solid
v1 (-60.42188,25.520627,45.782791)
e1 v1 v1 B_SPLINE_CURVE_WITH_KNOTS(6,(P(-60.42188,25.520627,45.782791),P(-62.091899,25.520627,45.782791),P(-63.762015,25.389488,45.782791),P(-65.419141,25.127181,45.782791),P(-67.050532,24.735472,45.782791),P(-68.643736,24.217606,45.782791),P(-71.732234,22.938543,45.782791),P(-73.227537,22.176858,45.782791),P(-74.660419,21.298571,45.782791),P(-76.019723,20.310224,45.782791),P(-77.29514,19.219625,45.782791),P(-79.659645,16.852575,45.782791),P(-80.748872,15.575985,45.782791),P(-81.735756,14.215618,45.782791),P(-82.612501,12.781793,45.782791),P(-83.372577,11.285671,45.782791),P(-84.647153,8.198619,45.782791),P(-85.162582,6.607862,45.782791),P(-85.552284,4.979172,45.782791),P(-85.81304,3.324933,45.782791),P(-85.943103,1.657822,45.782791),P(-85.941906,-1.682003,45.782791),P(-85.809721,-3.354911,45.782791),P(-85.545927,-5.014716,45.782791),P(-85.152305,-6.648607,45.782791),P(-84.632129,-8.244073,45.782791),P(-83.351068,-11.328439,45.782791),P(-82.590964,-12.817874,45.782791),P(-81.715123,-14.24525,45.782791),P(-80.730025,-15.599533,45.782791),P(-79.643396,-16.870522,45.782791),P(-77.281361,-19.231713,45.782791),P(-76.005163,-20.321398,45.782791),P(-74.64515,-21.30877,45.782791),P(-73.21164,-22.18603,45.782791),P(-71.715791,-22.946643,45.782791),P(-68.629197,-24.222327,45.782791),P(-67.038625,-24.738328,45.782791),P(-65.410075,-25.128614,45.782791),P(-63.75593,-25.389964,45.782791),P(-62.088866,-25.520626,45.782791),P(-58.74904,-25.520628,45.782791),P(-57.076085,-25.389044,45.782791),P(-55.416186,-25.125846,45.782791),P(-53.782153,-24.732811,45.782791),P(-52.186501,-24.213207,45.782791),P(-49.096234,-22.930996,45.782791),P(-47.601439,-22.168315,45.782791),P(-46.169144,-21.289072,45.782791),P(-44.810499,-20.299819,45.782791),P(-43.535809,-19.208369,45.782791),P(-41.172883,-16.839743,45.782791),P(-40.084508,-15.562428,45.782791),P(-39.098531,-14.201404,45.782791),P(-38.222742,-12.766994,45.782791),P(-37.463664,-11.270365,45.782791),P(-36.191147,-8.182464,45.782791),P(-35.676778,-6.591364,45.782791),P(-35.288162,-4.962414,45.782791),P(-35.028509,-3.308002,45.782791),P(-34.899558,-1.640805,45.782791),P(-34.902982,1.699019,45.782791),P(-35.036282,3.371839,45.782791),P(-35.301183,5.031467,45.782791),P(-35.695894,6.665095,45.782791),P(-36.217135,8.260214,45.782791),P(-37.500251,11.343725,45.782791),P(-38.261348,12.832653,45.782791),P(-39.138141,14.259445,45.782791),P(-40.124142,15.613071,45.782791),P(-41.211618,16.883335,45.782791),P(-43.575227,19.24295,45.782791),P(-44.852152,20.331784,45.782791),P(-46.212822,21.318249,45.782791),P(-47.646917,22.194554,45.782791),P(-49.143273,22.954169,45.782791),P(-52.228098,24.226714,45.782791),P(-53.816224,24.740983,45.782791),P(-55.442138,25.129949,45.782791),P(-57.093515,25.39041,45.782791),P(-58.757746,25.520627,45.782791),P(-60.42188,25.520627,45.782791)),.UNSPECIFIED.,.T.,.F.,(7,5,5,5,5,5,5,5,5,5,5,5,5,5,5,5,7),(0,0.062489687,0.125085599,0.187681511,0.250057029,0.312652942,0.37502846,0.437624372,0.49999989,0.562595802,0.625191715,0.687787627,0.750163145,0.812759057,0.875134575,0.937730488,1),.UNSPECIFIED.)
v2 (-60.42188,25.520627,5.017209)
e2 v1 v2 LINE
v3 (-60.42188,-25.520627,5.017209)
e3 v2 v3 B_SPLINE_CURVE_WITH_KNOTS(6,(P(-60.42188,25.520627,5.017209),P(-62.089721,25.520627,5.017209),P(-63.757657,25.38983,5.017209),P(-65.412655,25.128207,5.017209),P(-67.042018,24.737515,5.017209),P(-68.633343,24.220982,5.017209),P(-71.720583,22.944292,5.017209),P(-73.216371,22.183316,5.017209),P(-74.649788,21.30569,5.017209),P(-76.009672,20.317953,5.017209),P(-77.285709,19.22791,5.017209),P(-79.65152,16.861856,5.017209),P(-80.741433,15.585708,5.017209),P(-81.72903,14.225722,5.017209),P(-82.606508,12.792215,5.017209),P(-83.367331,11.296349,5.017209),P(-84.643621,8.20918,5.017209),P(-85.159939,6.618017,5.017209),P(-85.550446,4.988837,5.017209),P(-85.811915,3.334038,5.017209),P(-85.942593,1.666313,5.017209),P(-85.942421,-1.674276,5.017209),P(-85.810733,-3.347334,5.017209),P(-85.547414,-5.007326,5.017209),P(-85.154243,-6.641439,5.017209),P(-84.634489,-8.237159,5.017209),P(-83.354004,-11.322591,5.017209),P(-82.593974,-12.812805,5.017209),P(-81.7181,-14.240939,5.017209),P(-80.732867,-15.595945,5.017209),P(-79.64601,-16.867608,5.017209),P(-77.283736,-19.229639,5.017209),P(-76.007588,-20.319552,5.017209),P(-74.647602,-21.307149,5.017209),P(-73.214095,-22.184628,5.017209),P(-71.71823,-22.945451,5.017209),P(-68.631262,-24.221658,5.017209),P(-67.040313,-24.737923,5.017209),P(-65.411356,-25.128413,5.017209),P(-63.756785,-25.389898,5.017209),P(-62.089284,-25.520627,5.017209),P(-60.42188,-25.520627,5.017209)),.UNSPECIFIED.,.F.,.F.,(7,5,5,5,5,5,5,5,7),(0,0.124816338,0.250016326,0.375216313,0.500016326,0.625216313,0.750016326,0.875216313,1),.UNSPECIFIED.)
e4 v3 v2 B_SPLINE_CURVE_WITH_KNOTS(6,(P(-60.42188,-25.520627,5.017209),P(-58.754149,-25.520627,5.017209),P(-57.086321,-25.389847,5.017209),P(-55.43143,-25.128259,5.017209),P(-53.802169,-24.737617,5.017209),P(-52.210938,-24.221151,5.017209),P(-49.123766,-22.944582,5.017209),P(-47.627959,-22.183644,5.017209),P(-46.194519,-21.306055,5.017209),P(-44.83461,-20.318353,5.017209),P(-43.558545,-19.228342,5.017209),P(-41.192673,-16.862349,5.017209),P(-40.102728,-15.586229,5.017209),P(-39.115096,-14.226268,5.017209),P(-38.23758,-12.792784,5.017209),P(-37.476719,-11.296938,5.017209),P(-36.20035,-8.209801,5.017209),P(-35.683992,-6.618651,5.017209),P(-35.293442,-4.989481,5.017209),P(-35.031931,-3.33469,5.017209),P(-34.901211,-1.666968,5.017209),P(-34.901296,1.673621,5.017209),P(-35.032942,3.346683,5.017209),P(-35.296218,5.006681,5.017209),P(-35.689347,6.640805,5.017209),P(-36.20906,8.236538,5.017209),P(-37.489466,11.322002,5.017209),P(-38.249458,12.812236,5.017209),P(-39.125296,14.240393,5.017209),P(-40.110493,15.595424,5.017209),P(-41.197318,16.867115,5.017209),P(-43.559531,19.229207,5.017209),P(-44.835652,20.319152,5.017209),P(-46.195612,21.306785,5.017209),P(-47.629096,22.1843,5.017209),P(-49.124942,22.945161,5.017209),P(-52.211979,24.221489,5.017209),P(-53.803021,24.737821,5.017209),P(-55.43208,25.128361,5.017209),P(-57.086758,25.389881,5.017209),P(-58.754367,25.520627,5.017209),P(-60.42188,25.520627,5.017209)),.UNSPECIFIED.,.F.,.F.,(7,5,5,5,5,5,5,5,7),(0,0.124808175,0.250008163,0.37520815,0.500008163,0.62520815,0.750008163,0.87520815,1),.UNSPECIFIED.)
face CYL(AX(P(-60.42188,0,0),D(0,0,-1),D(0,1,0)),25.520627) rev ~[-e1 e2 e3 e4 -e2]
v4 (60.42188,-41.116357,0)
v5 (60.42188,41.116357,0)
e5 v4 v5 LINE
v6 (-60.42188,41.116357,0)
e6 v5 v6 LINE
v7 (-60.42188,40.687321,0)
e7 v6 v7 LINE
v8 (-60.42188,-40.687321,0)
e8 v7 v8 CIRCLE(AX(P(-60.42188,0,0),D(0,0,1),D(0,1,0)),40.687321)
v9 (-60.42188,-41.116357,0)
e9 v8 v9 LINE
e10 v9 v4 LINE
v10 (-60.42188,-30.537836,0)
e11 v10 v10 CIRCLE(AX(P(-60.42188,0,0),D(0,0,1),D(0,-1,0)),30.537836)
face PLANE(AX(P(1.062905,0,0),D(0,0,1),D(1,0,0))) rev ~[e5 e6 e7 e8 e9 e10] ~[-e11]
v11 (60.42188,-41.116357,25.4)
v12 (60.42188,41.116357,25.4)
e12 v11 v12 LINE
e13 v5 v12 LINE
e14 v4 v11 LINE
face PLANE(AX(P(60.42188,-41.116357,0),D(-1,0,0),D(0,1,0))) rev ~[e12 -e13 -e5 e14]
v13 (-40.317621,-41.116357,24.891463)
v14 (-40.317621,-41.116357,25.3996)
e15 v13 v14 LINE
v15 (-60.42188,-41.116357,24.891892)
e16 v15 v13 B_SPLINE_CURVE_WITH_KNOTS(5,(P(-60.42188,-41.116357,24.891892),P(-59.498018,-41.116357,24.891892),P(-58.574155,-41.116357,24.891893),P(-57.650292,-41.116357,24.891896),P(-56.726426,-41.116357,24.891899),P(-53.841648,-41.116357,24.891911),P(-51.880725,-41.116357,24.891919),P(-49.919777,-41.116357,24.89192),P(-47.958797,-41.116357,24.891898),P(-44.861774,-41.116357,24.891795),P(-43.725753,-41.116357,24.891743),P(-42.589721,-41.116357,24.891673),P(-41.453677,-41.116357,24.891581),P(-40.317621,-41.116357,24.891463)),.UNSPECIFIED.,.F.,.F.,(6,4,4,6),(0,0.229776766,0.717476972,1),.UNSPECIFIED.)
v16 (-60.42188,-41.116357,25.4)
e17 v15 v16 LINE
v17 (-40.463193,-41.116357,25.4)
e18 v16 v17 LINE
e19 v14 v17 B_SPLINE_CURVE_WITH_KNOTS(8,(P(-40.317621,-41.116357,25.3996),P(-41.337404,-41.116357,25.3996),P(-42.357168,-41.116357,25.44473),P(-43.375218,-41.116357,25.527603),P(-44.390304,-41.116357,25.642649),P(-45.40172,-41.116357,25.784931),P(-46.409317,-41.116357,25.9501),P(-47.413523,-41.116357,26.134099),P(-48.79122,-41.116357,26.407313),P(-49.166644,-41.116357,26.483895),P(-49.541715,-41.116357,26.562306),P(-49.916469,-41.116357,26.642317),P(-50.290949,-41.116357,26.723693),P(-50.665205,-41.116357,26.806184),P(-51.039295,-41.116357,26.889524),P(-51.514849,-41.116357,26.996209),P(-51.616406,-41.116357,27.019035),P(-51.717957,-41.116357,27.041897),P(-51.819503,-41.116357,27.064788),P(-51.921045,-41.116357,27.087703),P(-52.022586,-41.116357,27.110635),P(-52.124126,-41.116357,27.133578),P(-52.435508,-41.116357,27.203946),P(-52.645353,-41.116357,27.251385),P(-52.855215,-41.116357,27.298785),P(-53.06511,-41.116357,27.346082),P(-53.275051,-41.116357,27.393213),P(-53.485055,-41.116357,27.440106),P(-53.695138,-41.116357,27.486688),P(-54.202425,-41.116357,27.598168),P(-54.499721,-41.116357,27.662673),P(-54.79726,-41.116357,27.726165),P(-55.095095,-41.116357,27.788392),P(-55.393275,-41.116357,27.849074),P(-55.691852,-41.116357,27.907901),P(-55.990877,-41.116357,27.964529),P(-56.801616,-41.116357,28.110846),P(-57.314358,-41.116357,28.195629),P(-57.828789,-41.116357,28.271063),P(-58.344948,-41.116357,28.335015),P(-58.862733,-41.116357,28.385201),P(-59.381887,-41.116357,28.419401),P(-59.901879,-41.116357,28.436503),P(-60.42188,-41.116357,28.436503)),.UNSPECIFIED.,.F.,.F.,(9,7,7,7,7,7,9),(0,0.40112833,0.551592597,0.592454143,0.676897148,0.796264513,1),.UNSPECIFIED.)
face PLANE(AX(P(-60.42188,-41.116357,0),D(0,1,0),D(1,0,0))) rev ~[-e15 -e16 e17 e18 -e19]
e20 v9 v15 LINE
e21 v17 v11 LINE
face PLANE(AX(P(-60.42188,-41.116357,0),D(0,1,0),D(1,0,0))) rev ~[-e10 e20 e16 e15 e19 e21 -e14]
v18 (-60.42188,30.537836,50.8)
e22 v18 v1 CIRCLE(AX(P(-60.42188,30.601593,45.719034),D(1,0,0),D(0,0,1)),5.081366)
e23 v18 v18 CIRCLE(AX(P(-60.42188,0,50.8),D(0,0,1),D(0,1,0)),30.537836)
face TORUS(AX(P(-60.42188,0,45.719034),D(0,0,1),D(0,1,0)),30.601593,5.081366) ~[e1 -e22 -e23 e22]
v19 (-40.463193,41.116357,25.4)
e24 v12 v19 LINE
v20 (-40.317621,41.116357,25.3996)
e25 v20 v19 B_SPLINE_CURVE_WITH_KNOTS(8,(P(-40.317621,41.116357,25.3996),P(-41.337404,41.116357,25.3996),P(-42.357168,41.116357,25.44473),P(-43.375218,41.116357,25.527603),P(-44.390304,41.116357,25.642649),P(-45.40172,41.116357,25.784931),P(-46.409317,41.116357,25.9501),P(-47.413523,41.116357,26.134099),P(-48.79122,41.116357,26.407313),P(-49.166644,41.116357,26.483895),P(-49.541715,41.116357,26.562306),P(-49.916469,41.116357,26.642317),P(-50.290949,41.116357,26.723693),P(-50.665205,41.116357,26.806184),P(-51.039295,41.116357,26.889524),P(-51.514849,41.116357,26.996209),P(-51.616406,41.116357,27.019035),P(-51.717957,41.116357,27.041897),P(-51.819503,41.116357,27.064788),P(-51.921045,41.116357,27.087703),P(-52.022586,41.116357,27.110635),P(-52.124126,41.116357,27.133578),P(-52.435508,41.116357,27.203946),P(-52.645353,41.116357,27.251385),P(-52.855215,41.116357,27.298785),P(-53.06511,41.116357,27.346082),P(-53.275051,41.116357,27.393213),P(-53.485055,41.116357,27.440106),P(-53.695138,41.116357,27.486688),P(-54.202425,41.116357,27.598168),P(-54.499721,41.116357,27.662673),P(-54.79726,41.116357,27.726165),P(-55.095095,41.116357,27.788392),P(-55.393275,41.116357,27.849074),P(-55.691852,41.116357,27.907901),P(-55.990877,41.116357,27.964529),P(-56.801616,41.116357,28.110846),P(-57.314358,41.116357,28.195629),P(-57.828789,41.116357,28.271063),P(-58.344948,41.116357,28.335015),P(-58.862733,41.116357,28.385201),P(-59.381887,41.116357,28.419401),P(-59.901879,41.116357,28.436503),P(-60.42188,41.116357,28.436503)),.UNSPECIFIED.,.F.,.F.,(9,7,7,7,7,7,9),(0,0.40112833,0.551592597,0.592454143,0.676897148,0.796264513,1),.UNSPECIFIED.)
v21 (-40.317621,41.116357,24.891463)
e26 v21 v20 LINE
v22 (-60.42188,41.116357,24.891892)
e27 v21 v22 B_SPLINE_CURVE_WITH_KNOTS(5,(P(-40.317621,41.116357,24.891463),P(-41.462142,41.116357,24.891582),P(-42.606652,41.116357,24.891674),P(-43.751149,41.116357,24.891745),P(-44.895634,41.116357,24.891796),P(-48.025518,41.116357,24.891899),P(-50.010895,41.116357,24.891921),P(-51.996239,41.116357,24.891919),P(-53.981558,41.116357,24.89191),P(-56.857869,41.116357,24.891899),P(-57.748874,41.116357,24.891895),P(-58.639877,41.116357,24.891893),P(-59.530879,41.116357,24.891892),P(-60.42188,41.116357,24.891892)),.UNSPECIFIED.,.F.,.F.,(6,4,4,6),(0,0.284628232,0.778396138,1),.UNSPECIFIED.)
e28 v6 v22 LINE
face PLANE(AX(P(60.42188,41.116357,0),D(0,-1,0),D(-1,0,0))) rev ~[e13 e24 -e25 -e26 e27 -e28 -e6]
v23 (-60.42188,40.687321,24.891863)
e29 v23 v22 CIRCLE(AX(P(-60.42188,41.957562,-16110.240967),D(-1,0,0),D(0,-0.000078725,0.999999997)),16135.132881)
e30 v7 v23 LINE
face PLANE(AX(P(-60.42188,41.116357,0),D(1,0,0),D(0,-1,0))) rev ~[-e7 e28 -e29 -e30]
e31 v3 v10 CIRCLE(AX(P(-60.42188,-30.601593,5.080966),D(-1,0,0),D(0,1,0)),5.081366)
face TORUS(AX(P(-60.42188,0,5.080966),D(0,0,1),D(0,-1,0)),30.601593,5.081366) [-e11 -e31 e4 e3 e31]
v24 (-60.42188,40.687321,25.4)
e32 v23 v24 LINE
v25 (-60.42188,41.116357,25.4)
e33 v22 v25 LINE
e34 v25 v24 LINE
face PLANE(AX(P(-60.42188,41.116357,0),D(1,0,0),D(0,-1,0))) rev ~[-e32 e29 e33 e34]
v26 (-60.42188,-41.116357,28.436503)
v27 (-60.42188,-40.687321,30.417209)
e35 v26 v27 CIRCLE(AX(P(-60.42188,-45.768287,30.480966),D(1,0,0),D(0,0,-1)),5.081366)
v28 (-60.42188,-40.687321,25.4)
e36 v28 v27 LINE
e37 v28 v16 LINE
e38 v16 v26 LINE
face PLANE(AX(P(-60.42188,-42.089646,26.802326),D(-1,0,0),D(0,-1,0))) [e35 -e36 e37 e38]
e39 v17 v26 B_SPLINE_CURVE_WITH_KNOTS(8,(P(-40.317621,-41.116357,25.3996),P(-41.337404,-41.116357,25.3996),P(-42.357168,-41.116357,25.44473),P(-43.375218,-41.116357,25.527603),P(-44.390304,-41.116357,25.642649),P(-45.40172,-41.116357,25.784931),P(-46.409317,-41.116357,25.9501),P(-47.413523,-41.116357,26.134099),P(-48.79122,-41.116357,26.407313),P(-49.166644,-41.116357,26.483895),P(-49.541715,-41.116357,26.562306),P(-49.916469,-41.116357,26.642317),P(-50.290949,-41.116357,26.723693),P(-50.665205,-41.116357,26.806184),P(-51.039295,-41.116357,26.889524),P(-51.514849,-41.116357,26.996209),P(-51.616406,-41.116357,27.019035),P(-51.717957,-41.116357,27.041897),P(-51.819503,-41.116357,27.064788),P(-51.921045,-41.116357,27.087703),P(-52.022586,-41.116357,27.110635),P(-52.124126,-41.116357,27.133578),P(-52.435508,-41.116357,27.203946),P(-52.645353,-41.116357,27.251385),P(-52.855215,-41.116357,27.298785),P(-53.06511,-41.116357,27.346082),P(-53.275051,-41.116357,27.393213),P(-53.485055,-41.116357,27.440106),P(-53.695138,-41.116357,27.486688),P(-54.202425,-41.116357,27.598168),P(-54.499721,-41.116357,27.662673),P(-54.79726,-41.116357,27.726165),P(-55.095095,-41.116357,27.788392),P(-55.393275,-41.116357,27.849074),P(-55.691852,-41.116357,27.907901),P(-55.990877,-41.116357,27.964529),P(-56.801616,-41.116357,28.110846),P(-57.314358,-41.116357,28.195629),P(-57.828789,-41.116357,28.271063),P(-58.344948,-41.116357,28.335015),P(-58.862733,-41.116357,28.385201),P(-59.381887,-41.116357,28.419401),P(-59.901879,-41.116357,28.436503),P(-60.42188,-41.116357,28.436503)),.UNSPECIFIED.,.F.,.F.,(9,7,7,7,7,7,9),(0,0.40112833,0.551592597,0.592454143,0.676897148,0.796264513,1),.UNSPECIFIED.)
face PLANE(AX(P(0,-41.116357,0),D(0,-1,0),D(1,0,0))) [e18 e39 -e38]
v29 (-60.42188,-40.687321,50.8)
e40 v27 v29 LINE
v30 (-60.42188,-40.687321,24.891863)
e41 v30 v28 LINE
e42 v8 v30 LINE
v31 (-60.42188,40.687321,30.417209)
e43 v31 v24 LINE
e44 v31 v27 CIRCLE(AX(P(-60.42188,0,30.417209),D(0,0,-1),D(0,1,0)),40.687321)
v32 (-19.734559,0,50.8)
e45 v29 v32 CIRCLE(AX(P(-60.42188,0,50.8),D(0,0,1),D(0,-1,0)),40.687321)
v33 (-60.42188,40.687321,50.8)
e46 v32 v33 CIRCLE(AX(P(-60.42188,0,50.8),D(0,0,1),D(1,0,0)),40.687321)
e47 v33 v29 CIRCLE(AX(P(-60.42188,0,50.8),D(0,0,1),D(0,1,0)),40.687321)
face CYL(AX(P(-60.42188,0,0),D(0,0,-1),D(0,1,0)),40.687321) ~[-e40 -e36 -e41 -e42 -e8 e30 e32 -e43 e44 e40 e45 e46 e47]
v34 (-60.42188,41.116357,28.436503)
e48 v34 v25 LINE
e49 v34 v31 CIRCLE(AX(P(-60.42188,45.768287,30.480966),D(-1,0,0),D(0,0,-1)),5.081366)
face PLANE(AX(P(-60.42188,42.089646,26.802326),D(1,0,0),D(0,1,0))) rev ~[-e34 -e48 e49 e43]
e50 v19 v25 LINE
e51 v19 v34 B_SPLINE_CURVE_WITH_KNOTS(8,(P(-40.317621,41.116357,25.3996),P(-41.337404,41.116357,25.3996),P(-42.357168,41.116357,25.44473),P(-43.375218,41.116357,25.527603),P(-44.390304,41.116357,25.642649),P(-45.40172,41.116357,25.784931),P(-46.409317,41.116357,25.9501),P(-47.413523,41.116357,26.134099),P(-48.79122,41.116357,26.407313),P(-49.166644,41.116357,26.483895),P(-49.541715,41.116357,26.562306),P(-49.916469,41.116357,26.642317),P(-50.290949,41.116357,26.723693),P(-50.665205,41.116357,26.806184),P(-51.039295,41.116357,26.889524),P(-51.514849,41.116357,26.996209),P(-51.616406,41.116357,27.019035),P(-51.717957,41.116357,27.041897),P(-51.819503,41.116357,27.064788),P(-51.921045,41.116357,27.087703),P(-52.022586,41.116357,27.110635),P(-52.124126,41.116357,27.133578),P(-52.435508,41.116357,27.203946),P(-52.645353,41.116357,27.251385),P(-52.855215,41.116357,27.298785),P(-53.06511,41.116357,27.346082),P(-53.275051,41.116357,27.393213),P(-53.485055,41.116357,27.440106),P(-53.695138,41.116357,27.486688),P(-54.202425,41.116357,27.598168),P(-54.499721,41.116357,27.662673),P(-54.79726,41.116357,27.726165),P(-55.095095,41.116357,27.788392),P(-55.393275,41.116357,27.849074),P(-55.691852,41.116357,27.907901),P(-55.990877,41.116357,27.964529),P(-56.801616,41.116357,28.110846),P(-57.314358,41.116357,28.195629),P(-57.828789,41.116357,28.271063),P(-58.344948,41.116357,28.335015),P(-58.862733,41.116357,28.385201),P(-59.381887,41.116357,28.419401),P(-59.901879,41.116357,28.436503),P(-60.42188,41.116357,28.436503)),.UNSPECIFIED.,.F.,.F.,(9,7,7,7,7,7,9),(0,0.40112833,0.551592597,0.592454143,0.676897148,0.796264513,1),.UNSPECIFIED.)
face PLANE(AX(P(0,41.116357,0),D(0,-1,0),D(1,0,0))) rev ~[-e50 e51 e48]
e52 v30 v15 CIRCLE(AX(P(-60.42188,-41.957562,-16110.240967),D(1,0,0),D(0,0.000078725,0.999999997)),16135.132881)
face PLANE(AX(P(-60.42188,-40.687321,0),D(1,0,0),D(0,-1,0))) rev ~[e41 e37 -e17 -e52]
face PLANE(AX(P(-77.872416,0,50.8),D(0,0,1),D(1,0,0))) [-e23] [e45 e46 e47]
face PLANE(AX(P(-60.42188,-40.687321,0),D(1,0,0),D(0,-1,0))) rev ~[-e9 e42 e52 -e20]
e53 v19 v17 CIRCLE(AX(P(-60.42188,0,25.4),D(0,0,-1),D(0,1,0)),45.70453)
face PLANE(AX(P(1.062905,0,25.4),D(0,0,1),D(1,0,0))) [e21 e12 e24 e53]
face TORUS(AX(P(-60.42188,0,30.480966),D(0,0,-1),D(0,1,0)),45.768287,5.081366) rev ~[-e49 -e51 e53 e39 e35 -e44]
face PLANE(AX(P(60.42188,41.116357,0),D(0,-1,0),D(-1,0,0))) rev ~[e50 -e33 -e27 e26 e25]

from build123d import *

# Parameters (mm, degrees)
F1_DEPTH    = 25.4
F2_DEPTH    = 50.8
F4_T4_ANGLE = 180


# Not quite as in the source:
# - a fillet or chamfer that OpenCascade refuses, or shapes differently, is made with other operations: its cross-section is extruded or revolved along the edge and cut away or added
# - a feature of the source that left no trace in its solid (it failed there, or was rolled back) is left out


with BuildPart() as f1:
    # F0 (on Top) → F1 (new body)
    with BuildSketch(Plane.XY):
        with BuildLine():
            Line((60.4218803346, 41.1163568497), (-60.4218803346, 41.1163568497))
            Line((-60.4218803346, 41.1163568497), (-60.4218803346, 40.6873208554))
            ThreePointArc((-60.4218803346, 40.6873208554), (-31.6515998495, 28.7702804852), (-19.7345594792, 0))
            ThreePointArc((-19.7345594792, 0), (-31.6515998495, -28.7702804852), (-60.4218803346, -40.6873208554))
            Line((-60.4218803346, -40.6873208554), (-60.4218803346, -41.1163568497))
            Line((-60.4218803346, -41.1163568497), (60.4218803346, -41.1163568497))
            Line((60.4218803346, -41.1163568497), (60.4218803346, 41.1163568497))
        make_face()
        with BuildLine():
            ThreePointArc((-19.7345594792, 0), (-31.6515998495, 28.7702804852), (-60.4218803346, 40.6873208554))
            Line((-60.4218803346, 40.6873208554), (-60.4218803346, 25.5206269771))
            ThreePointArc((-60.4218803346, 25.5206269771), (-42.376071939, 18.0458083957), (-34.9012533575, 0))
            ThreePointArc((-34.9012533575, 0), (-42.376071939, -18.0458083957), (-60.4218803346, -25.5206269771))
            Line((-60.4218803346, -25.5206269771), (-60.4218803346, -40.6873208554))
            ThreePointArc((-60.4218803346, -40.6873208554), (-31.6515998495, -28.7702804852), (-19.7345594792, 0))
        make_face()
        with BuildLine():
            Line((-60.4218803346, 25.5206269771), (-60.4218803346, 40.6873208554))
            ThreePointArc((-60.4218803346, 40.6873208554), (-101.10920119, 0), (-60.4218803346, -40.6873208554))
            Line((-60.4218803346, -40.6873208554), (-60.4218803346, -25.5206269771))
            ThreePointArc((-60.4218803346, -25.5206269771), (-85.9425073118, 0), (-60.4218803346, 25.5206269771))
        make_face()
    extrude(amount=F1_DEPTH)

    # F0 (on Top) → F2 (join)
    with BuildSketch(Plane.XY):
        with BuildLine():
            Line((-60.4218803346, 25.5206269771), (-60.4218803346, 40.6873208554))
            ThreePointArc((-60.4218803346, 40.6873208554), (-101.10920119, 0), (-60.4218803346, -40.6873208554))
            Line((-60.4218803346, -40.6873208554), (-60.4218803346, -25.5206269771))
            ThreePointArc((-60.4218803346, -25.5206269771), (-85.9425073118, 0), (-60.4218803346, 25.5206269771))
        make_face()
        with BuildLine():
            ThreePointArc((-19.7345594792, 0), (-31.6515998495, 28.7702804852), (-60.4218803346, 40.6873208554))
            Line((-60.4218803346, 40.6873208554), (-60.4218803346, 25.5206269771))
            ThreePointArc((-60.4218803346, 25.5206269771), (-42.376071939, 18.0458083957), (-34.9012533575, 0))
            ThreePointArc((-34.9012533575, 0), (-42.376071939, -18.0458083957), (-60.4218803346, -25.5206269771))
            Line((-60.4218803346, -25.5206269771), (-60.4218803346, -40.6873208554))
            ThreePointArc((-60.4218803346, -40.6873208554), (-31.6515998495, -28.7702804852), (-19.7345594792, 0))
        make_face()
    extrude(amount=F2_DEPTH)

    # F4: fillet of radius 5.08 on 6 edges, made by hand


with BuildPart() as f4_tool2:
    # F4_s3 → F4_t4 (revolve)
    with BuildSketch(Plane.YZ.offset(-60.4218803346)):
        with BuildLine():
            ThreePointArc((45.7682865408, 25.3996), (42.175218407, 26.8878975516), (40.6869208554, 30.4809656854))
            Line((40.6869208554, 30.4809656854), (40.1787842868, 30.4809656854))
            ThreePointArc((40.1787842868, 30.4809656854), (40.1791842868, 27.9404828427), (40.1791842868, 25.4))
            Line((40.1791842868, 25.4), (40.6873208554, 24.8918634315))
            ThreePointArc((40.6873208554, 24.8918634315), (43.2278036981, 24.8918634315), (45.7682865408, 24.8914634315))
            Line((45.7682865408, 24.8914634315), (45.7682865408, 25.3996))
        make_face()
    revolve(axis=Axis((-60.4218803346, 0, 25.4), (0, 0, -1)), revolution_arc=F4_T4_ANGLE)

    split(bisect_by=Plane.XZ.offset(-41.1163568497), keep=Keep.TOP)

    split(bisect_by=Plane.XZ.offset(41.1163568497), keep=Keep.BOTTOM)


with BuildPart() as f1_1:
    add(f1.part)

    # F4_t1: union F4_tool2
    add(f4_tool2.part)

    # F4_s7 → F4_t8 (revolve, cut)
    with BuildSketch(Plane.YZ.offset(-60.4218803346)):
        with BuildLine():
            ThreePointArc((30.6015926626, 50.8004), (27.0085245287, 49.3121024484), (25.5202269771, 45.7190343146))
            Line((25.5202269771, 45.7190343146), (25.0120904086, 45.7190343146))
            ThreePointArc((25.0120904086, 45.7190343146), (25.0124904086, 48.2595171573), (25.0124904086, 50.8))
            Line((25.0124904086, 50.8), (25.5206269771, 51.3081365685))
            ThreePointArc((25.5206269771, 51.3081365685), (28.0611098198, 51.3081365685), (30.6015926626, 51.3085365685))
            Line((30.6015926626, 51.3085365685), (30.6015926626, 50.8004))
        make_face()
    revolve(axis=Axis((-60.4218803346, 0, 50.8), (0, 0, -1)), mode=Mode.SUBTRACT)

    # F4_s9 → F4_t10 (revolve, cut)
    with BuildSketch(Plane.YZ.offset(-60.4218803346)):
        with BuildLine():
            ThreePointArc((-25.5202269771, 5.0809656854), (-27.0085245287, 1.4878975516), (-30.6015926626, -0.0004))
            Line((-30.6015926626, -0.0004), (-30.6015926626, -0.5085365685))
            ThreePointArc((-30.6015926626, -0.5085365685), (-28.0611098198, -0.5081365685), (-25.5206269771, -0.5081365685))
            Line((-25.5206269771, -0.5081365685), (-25.0124904086, 0))
            ThreePointArc((-25.0124904086, 0), (-25.0124904086, 2.5404828427), (-25.0120904086, 5.0809656854))
            Line((-25.0120904086, 5.0809656854), (-25.5202269771, 5.0809656854))
        make_face()
    revolve(axis=Axis((-60.4218803346, 0, 0), (0, 0, 1)), mode=Mode.SUBTRACT)


solid = f1_1.part
